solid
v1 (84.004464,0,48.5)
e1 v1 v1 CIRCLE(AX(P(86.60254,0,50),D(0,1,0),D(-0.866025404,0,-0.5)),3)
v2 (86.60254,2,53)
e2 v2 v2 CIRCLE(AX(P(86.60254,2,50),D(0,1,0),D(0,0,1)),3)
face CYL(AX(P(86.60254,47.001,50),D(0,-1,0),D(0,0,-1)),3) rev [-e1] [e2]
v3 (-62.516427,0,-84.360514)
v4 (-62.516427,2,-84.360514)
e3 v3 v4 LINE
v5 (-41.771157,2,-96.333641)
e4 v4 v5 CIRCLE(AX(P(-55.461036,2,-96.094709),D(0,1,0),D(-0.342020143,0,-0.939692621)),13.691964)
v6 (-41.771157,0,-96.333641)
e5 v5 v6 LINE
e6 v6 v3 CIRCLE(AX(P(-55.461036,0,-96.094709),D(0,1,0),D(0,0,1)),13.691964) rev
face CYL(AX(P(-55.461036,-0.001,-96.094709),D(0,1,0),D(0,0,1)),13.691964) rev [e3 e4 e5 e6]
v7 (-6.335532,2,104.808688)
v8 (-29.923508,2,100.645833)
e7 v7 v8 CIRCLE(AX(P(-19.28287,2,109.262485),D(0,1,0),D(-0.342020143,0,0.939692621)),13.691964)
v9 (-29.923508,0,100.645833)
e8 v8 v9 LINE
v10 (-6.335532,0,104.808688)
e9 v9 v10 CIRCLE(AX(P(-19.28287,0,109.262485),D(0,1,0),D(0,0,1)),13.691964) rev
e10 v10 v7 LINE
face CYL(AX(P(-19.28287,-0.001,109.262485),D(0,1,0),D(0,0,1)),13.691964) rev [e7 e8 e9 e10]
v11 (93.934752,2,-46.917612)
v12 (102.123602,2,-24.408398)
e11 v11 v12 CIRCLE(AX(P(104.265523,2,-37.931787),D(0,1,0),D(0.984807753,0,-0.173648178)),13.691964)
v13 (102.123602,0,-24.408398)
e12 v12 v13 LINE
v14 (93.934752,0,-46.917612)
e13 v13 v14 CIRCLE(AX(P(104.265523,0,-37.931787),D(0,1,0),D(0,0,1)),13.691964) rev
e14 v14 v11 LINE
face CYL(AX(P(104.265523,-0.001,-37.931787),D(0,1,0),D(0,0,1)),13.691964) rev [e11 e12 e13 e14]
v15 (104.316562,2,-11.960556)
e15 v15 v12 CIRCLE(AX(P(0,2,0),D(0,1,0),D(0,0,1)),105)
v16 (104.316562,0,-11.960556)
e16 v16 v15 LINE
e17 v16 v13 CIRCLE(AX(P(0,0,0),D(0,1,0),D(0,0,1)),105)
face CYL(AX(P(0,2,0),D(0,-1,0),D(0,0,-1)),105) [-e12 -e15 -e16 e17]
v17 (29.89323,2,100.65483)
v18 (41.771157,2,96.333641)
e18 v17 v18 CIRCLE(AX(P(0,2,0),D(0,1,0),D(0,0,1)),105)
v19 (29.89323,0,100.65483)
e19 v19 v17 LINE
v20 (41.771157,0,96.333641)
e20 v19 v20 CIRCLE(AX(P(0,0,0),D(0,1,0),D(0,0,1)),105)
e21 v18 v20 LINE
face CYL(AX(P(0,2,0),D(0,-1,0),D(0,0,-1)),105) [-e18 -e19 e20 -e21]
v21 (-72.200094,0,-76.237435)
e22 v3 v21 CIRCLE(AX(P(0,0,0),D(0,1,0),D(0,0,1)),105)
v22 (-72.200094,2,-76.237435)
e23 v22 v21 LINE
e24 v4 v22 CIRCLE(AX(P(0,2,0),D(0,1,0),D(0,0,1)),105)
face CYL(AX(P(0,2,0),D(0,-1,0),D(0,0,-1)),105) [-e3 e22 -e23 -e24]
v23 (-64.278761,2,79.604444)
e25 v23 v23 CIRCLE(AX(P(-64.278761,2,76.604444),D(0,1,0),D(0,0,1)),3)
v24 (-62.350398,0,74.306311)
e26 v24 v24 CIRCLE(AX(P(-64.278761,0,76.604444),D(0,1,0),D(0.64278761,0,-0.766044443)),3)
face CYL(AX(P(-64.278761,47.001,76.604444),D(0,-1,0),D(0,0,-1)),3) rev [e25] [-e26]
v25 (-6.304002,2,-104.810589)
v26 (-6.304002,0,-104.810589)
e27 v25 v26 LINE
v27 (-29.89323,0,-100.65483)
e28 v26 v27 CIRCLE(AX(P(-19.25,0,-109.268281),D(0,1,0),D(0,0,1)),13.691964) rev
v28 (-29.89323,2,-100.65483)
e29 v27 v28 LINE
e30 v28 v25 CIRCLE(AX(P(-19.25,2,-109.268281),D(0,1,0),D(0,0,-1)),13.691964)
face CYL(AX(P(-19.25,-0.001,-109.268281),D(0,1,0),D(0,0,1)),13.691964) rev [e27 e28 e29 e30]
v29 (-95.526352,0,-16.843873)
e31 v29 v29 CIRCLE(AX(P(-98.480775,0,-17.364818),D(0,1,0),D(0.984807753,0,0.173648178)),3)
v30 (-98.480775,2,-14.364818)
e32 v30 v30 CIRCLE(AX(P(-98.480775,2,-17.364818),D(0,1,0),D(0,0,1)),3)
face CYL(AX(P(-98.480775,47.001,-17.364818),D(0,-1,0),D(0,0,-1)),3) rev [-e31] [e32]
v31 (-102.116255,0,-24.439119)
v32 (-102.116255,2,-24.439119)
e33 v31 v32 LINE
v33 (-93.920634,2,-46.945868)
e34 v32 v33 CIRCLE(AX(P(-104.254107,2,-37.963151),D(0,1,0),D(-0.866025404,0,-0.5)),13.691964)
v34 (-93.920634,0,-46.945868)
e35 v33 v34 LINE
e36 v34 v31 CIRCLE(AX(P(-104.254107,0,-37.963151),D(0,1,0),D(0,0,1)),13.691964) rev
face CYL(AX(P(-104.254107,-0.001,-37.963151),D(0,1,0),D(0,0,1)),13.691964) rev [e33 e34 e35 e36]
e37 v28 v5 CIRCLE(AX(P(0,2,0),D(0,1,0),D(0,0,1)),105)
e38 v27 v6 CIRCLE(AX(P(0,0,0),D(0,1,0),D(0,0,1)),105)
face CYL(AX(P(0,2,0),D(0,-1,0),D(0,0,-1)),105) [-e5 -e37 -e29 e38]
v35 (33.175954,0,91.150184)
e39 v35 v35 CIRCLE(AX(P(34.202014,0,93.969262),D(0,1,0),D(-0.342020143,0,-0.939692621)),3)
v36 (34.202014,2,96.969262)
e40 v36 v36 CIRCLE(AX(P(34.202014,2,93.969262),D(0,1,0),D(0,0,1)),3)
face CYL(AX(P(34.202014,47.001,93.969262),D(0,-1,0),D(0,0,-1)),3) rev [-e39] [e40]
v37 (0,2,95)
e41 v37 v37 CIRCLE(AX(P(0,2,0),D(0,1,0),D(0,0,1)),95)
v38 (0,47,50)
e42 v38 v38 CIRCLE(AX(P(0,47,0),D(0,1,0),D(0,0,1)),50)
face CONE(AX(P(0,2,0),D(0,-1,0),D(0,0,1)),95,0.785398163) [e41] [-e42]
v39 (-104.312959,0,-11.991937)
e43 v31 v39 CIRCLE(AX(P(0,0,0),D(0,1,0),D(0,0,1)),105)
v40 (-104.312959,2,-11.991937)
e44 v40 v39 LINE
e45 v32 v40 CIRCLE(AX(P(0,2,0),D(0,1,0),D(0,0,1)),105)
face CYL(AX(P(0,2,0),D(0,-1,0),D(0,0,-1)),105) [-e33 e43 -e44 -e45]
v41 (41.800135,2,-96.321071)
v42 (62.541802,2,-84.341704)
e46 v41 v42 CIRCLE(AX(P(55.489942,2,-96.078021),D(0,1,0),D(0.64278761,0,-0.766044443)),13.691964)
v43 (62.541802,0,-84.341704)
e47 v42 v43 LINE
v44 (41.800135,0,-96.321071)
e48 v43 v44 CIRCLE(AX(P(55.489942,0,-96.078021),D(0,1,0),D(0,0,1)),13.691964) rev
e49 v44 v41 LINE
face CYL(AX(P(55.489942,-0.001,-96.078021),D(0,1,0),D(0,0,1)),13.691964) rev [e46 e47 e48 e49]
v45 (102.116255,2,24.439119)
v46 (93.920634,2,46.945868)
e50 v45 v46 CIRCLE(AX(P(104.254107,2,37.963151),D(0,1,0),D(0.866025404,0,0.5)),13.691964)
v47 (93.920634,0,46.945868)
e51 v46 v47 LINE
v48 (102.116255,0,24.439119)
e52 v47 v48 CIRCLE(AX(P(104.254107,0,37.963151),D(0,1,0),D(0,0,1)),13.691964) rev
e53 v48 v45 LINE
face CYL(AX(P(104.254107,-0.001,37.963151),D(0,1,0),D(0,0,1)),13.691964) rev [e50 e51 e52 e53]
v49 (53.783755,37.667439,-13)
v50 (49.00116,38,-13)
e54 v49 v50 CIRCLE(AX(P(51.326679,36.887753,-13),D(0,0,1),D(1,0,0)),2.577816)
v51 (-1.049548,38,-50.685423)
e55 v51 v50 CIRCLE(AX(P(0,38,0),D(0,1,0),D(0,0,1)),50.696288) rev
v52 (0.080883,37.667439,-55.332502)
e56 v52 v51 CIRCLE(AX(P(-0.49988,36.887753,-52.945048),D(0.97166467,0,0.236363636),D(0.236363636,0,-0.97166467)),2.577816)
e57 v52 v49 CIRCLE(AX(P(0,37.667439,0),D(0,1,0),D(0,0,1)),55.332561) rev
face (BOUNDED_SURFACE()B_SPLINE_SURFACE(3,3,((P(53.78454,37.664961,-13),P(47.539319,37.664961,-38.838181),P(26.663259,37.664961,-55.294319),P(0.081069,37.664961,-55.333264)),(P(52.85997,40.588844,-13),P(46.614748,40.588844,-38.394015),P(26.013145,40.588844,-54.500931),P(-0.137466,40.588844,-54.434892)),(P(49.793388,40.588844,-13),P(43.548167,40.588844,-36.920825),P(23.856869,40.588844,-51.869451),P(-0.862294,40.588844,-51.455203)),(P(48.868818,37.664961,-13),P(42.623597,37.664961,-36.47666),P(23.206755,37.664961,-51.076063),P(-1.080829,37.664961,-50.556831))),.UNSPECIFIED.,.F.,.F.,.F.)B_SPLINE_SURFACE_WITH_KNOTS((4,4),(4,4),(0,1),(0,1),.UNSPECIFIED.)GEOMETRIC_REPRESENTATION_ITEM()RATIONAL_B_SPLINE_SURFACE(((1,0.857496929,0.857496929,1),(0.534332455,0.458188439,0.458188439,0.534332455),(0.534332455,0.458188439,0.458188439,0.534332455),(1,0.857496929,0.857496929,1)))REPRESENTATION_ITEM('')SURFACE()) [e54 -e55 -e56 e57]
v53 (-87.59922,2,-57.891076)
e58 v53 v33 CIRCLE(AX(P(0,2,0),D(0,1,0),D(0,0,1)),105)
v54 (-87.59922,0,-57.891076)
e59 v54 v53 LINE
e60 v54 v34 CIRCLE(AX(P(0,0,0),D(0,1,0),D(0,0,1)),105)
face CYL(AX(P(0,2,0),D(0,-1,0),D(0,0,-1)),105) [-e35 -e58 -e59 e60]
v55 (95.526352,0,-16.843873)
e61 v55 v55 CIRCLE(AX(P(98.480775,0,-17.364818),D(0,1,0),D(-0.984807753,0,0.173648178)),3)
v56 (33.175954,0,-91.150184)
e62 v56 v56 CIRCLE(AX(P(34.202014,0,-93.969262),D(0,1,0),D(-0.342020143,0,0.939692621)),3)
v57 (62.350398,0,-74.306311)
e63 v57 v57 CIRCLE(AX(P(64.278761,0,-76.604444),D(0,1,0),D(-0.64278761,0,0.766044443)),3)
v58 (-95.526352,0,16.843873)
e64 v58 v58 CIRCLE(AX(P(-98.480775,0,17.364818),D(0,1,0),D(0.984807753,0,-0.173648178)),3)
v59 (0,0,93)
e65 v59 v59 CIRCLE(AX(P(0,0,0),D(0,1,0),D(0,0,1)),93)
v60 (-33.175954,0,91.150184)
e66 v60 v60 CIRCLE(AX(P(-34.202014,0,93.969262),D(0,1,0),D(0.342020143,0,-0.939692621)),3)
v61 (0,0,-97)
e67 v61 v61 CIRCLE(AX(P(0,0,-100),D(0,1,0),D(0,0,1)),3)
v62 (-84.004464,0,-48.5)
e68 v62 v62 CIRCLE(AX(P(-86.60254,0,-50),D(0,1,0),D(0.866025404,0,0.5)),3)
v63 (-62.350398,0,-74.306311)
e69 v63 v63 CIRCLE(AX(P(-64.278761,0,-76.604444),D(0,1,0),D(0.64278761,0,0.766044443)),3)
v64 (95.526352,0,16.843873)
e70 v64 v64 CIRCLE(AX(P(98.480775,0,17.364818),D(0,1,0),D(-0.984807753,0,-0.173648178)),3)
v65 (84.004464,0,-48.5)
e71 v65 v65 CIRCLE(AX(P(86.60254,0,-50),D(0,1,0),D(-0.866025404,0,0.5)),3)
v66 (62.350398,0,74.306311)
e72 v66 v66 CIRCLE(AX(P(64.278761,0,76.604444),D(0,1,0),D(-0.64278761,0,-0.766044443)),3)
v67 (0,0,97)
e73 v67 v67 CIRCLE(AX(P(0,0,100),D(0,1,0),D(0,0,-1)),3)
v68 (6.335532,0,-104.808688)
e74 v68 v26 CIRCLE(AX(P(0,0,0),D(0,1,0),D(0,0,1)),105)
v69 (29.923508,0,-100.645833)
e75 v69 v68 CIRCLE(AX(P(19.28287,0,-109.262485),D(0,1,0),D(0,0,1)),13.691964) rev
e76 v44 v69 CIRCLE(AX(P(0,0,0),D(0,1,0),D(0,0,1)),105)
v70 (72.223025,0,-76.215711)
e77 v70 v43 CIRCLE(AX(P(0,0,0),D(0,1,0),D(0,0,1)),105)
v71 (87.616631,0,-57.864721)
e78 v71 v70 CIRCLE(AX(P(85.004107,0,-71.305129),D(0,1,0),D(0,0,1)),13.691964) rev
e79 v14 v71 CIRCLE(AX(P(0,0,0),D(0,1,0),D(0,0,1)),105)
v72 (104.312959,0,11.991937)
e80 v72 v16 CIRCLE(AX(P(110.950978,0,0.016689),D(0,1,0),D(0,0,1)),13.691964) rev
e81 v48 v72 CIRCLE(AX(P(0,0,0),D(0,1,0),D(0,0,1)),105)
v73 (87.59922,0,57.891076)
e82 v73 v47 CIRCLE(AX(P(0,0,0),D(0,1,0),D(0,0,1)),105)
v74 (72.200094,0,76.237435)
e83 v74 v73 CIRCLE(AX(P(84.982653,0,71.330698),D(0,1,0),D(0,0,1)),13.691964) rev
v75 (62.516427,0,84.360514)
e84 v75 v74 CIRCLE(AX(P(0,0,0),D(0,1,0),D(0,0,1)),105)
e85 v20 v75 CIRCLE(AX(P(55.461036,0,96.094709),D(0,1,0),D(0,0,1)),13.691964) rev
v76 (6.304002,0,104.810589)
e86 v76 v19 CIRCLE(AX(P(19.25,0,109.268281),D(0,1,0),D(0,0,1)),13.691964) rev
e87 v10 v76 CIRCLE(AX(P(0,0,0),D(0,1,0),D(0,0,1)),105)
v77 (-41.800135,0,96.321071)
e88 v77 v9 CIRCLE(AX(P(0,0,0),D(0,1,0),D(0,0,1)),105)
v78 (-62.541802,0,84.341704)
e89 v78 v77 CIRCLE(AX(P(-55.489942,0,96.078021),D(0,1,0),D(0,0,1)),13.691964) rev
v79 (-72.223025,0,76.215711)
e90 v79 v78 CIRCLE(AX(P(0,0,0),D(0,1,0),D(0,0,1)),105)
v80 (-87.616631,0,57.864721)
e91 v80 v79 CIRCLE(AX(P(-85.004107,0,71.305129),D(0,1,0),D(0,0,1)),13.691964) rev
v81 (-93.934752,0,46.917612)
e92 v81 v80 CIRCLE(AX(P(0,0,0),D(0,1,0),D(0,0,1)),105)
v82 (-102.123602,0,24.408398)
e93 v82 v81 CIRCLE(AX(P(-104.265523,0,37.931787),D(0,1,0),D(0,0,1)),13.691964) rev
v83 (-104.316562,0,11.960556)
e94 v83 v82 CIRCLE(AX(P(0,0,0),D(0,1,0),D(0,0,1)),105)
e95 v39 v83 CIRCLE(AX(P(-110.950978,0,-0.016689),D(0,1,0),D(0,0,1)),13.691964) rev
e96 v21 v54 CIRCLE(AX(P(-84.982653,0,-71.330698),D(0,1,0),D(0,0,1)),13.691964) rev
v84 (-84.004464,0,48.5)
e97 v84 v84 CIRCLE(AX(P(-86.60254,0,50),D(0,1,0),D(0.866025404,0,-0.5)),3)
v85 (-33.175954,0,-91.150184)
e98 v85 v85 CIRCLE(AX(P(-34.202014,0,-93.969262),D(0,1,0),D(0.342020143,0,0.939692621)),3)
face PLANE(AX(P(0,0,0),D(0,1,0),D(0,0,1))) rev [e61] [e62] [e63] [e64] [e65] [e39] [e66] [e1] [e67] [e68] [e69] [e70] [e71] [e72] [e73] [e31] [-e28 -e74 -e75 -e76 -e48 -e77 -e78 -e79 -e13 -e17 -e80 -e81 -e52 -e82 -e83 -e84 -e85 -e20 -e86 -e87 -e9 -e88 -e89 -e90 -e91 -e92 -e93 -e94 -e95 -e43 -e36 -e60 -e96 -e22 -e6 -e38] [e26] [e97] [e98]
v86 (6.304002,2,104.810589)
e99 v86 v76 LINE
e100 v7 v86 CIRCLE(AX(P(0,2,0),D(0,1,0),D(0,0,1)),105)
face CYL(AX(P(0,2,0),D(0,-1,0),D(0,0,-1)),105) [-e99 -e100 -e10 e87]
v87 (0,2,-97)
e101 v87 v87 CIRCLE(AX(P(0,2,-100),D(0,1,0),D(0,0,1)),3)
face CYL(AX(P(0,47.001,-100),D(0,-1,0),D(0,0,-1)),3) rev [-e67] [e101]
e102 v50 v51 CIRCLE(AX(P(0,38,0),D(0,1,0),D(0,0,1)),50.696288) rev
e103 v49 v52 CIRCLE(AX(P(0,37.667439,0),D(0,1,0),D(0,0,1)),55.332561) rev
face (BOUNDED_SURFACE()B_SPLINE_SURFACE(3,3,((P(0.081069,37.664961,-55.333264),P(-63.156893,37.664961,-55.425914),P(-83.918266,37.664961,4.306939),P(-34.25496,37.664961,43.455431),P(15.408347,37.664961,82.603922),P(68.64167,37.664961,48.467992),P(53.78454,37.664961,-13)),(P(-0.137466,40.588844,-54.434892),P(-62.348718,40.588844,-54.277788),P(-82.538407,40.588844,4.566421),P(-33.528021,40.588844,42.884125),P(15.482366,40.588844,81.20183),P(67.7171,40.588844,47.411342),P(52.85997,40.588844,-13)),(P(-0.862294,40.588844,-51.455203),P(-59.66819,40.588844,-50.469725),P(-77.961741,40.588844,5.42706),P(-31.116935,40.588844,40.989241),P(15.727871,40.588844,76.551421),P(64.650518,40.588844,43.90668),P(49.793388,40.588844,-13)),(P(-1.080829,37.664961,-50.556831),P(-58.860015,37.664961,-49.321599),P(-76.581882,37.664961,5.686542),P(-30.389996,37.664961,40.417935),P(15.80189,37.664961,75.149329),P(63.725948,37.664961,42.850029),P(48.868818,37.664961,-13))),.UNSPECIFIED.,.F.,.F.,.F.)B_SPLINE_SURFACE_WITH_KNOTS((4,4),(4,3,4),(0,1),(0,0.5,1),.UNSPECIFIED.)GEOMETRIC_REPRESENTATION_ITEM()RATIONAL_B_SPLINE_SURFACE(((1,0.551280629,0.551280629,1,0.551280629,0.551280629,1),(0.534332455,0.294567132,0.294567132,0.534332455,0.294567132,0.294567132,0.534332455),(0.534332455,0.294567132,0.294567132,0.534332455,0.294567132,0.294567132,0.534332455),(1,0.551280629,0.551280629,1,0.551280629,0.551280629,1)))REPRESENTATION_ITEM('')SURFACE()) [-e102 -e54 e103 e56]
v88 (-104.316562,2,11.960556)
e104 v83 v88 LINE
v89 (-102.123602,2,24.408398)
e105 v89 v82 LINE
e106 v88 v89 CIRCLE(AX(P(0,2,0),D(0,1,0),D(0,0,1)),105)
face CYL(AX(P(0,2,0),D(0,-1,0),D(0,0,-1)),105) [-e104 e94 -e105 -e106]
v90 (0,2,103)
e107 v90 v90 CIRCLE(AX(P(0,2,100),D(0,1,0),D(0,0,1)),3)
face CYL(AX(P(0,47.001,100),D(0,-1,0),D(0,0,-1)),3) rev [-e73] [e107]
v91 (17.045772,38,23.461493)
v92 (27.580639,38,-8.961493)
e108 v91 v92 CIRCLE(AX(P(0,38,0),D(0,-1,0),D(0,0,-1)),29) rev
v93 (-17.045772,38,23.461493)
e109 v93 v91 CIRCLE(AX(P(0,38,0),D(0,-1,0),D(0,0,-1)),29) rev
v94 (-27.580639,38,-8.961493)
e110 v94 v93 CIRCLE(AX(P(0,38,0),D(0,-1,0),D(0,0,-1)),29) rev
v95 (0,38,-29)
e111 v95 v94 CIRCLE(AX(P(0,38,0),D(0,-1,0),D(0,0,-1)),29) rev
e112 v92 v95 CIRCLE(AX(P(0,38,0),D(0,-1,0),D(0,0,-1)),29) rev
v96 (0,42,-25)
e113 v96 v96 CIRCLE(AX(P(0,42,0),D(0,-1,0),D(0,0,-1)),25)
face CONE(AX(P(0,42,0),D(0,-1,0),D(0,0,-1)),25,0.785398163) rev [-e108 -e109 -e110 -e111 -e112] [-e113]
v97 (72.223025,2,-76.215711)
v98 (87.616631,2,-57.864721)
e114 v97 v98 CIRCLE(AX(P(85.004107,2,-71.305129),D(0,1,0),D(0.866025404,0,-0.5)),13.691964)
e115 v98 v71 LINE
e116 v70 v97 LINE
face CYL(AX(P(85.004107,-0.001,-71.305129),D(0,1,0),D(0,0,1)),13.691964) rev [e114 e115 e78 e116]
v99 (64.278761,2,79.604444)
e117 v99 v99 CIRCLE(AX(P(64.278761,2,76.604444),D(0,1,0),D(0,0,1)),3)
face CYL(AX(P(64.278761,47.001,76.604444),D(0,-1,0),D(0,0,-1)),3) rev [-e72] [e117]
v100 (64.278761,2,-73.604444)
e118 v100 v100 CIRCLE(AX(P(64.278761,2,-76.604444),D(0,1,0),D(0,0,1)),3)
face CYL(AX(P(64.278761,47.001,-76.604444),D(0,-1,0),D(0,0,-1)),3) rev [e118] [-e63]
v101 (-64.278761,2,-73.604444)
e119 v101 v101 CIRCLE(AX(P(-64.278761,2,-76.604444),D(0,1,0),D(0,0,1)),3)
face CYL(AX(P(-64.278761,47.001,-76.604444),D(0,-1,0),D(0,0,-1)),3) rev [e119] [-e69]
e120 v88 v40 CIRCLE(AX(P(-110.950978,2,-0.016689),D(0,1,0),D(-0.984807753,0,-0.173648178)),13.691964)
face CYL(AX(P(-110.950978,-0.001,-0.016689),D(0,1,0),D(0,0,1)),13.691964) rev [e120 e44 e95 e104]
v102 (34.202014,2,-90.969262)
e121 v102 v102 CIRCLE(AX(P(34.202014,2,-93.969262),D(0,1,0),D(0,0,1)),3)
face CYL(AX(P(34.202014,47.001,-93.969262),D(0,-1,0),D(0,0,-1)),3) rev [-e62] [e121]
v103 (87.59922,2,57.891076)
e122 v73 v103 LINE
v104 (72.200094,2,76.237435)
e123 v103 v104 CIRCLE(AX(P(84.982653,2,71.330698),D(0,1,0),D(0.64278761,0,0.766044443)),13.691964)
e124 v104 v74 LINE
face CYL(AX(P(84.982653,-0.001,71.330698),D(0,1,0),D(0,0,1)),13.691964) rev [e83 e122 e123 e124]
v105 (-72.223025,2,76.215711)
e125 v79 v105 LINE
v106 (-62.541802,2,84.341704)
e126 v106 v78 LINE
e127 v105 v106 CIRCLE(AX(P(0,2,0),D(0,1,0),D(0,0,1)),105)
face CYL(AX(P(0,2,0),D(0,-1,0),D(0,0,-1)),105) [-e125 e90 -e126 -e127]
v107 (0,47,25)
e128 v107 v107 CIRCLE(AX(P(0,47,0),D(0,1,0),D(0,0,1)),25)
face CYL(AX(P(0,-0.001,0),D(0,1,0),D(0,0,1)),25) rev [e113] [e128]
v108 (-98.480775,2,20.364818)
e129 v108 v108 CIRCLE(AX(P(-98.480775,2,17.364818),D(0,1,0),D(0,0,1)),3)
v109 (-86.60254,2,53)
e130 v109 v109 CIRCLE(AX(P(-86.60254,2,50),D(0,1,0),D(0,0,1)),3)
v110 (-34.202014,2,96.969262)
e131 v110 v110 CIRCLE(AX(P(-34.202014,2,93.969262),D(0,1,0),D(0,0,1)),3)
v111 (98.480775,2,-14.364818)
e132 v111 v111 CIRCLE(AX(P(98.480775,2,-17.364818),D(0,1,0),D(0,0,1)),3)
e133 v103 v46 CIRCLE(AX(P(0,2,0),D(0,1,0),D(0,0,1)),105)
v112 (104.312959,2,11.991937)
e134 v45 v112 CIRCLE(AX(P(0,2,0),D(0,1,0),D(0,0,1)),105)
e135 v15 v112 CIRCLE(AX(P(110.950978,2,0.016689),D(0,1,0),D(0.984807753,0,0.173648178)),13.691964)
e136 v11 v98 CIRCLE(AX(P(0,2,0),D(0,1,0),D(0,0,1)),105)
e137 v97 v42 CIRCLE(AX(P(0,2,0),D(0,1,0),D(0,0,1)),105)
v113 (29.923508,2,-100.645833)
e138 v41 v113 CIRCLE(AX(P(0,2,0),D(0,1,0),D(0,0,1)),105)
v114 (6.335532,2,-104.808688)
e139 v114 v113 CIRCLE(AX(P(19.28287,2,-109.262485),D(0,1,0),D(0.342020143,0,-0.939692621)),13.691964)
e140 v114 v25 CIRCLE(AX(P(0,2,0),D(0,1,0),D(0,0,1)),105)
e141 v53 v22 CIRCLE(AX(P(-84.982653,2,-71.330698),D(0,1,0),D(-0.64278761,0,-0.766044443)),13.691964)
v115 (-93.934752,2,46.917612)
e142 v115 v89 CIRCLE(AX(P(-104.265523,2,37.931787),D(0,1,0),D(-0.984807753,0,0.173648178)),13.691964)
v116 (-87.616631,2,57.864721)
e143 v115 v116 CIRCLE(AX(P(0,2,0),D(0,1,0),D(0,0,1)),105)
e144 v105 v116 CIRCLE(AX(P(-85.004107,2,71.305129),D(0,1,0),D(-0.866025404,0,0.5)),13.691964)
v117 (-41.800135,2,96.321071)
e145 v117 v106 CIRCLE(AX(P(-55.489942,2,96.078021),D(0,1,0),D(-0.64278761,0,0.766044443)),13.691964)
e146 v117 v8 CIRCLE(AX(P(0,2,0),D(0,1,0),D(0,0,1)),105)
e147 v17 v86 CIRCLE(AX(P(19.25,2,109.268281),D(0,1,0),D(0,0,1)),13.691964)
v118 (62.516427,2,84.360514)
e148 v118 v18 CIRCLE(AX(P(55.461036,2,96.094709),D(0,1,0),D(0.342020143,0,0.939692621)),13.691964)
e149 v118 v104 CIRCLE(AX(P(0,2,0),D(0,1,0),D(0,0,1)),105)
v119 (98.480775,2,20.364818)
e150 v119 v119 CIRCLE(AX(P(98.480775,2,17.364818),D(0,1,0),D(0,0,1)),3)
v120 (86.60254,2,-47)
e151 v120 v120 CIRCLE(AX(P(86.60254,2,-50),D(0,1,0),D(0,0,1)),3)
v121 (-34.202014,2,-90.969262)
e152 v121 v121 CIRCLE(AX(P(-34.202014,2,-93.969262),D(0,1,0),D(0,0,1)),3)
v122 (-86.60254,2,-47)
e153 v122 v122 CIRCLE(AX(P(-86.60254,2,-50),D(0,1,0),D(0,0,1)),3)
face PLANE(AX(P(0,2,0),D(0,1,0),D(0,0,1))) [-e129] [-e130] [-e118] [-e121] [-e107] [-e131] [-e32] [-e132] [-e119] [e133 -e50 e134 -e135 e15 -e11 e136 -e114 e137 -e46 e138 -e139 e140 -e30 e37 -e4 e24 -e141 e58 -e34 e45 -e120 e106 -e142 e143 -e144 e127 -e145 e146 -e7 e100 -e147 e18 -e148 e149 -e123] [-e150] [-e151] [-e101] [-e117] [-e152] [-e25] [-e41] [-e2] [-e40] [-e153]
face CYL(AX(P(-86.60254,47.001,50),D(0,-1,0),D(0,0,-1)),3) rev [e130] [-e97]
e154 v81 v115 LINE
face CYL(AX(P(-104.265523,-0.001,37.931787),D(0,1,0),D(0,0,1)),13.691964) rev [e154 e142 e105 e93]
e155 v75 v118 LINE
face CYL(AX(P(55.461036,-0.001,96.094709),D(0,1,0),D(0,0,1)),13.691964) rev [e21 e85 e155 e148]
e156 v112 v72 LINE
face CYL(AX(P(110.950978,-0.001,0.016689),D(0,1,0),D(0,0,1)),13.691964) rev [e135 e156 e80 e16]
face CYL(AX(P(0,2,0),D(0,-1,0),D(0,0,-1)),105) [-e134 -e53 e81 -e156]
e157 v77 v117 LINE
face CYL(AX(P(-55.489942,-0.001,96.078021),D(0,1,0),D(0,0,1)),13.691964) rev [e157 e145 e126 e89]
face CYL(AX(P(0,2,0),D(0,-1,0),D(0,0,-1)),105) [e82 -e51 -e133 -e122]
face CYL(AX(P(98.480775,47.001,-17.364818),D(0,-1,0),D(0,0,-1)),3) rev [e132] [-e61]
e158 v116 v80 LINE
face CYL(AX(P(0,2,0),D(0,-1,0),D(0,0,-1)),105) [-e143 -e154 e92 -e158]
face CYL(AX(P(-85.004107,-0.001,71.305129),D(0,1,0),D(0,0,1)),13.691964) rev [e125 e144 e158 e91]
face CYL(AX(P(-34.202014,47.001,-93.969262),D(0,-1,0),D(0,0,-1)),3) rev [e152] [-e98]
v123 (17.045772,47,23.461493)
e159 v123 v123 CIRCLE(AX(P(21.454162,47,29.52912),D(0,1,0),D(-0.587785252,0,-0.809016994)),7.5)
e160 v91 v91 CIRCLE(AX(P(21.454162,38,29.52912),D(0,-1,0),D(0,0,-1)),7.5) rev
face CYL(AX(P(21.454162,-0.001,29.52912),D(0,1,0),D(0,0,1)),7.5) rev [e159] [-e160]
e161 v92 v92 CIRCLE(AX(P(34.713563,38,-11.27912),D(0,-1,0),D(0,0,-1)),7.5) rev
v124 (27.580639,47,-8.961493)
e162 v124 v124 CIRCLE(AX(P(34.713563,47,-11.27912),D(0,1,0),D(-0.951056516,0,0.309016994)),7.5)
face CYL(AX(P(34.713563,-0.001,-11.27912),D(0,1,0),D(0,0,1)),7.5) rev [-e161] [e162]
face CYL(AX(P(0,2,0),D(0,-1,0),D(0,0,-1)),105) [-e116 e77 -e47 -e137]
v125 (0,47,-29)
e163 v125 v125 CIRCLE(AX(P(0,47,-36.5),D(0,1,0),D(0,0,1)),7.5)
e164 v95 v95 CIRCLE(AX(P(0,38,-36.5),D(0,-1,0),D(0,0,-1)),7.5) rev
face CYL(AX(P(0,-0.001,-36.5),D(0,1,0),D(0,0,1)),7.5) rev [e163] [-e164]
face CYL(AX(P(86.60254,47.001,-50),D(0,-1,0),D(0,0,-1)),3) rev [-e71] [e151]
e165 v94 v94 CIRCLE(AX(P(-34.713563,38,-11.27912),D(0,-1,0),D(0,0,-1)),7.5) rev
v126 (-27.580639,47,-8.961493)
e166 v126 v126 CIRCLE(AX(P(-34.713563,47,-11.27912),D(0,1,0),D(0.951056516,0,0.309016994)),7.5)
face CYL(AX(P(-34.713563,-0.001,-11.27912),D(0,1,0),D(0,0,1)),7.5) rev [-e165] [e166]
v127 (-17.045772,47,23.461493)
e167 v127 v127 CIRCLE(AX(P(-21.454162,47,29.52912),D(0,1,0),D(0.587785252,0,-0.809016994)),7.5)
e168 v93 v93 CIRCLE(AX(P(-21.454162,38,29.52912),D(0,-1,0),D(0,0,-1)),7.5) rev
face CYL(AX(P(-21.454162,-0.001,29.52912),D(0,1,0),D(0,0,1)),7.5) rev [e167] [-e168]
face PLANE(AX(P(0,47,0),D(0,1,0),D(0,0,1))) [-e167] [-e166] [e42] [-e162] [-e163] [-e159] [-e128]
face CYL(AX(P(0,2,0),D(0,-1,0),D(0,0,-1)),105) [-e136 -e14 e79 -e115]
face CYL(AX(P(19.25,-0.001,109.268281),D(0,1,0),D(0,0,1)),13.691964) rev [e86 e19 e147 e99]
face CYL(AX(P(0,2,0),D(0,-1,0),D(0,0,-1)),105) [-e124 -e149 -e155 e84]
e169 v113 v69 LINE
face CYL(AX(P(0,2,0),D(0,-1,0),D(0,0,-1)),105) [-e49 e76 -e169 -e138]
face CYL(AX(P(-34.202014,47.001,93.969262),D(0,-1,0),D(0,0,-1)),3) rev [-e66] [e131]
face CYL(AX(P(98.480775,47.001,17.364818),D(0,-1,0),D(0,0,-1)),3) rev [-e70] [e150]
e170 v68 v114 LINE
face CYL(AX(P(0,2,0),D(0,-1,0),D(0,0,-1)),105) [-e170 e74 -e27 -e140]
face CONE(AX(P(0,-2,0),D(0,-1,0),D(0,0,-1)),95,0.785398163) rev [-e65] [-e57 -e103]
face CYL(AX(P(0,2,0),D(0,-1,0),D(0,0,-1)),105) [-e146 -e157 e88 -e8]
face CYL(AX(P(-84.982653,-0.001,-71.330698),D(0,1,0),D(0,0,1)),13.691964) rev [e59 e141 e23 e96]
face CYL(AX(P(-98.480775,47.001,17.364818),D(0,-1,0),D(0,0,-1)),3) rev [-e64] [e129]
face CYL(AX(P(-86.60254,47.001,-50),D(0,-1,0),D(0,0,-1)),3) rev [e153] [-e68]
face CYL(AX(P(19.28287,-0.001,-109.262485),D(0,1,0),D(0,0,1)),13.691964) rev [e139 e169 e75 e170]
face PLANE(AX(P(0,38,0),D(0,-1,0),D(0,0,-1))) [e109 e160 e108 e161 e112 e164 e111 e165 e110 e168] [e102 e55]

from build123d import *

# Parameters (mm, degrees)
SKETCH1_R           = 105
BOSS_EXTRUDE1_DEPTH = 2
BOSS_EXTRUDE2_START = 2
SKETCH2_R           = 95
BOSS_EXTRUDE2_DEPTH = 45
BOSS_EXTRUDE2_TAPER = 45
CUT_EXTRUDE2_START  = 2
SKETCH3_R           = 95
CUT_EXTRUDE2_DEPTH  = 40
CUT_EXTRUDE2_DRAFT  = -45
CUT_EXTRUDE3_REACH  = 157.753
SKETCH4_R           = 25
CHAMFER7_SIZE       = 4
CUT_EXTRUDE4_REACH  = 157.753
SKETCH7_R           = 7.5
CIRPATTERN1_COUNT   = 5
CUT_EXTRUDE5_REACH  = 157.753
SKETCH10_R          = 3
CIRPATTERN2_COUNT   = 18
CUT_EXTRUDE7_REACH  = 157.161
SKETCH12_R          = 13.691963716
CIRPATTERN4_COUNT   = 18


with BuildPart() as part:
    # Sketch1 → Boss-Extrude1 (new body)
    with BuildSketch(Plane(origin=(0, 0, 0), x_dir=(1, 0, 0), z_dir=(0, 1, 0))):
        Circle(SKETCH1_R)
    extrude(amount=BOSS_EXTRUDE1_DEPTH)

    # Sketch2 → Boss-Extrude2 (add)
    with BuildSketch(Plane(origin=(0, 0, 0), x_dir=(1, 0, 0), z_dir=(0, 1, 0)).offset(BOSS_EXTRUDE2_START)):
        Circle(SKETCH2_R)
    extrude(amount=BOSS_EXTRUDE2_DEPTH, taper=BOSS_EXTRUDE2_TAPER)


with BuildPart() as cut_extrude2_tool:
    # Sketch3 → Cut-Extrude2 (with draft: the straight prism first)
    with BuildSketch(Plane.XZ.offset(CUT_EXTRUDE2_START)):
        Circle(SKETCH3_R)
    extrude(amount=-CUT_EXTRUDE2_DEPTH)
    # Cut-Extrude2: the draft: its side faces are tilted about the plane it starts from
    cut_extrude2_sides = [cut_extrude2_tool.faces().sort_by_distance(p)[0] for p in [
        (-95, 18, 0),
    ]]
    draft(cut_extrude2_sides, Plane.XZ.offset(CUT_EXTRUDE2_START), CUT_EXTRUDE2_DRAFT)


with BuildPart() as part_1:
    add(part.part)

    # Cut-Extrude2: cut by cut_extrude2_tool
    add(cut_extrude2_tool.part, mode=Mode.SUBTRACT)

    # Sketch4 → Cut-Extrude3 (cut, up to next)
    with BuildSketch(Plane(origin=(0, 47, 0), x_dir=(1, 0, 0), z_dir=(0, 1, 0)), mode=Mode.PRIVATE) as cut_extrude3_sk1:
        Circle(SKETCH4_R)
    cut_extrude3_tool1 = extrude(cut_extrude3_sk1.sketch, amount=-CUT_EXTRUDE3_REACH, mode=Mode.PRIVATE) & part_1.part
    add(cut_extrude3_tool1.solids().sort_by_distance((0, 47, 0))[0], mode=Mode.SUBTRACT)

    # Chamfer7
    chamfer7_edges = [part_1.edges().sort_by_distance(p)[0] for p in [
        (-25, 38, 0),
    ]]
    chamfer(chamfer7_edges, length=CHAMFER7_SIZE)

    # Sketch7 → Cut-Extrude4 (cut, up to next)
    with BuildSketch(Plane(origin=(0, 47, 0), x_dir=(1, 0, 0), z_dir=(0, 1, 0)), mode=Mode.PRIVATE) as cut_extrude4_sk1:
        with Locations((0, 36.5)):
            Circle(SKETCH7_R)
    cut_extrude4_tool1 = extrude(cut_extrude4_sk1.sketch, amount=-CUT_EXTRUDE4_REACH, mode=Mode.PRIVATE) & part_1.part
    cut_extrude4 = cut_extrude4_tool1.solids().sort_by_distance((0, 47, -36.5))[0]
    add(cut_extrude4, mode=Mode.SUBTRACT)

    # CirPattern1: Cut-Extrude4 ×5 about axis
    cirpattern1_axis = Axis((0, 47, 0), (0, 1, 0))
    for i in range(1, CIRPATTERN1_COUNT):
        add(cut_extrude4.rotate(cirpattern1_axis, i * 360 / CIRPATTERN1_COUNT), mode=Mode.SUBTRACT)

    # Sketch10 → Cut-Extrude5 (cut, up to next)
    with BuildSketch(Plane(origin=(0, 0, 0), x_dir=(1, 0, 0), z_dir=(0, 1, 0)), mode=Mode.PRIVATE) as cut_extrude5_sk1:
        with Locations((0, 100)):
            Circle(SKETCH10_R)
    cut_extrude5_tool1 = extrude(cut_extrude5_sk1.sketch, amount=CUT_EXTRUDE5_REACH, mode=Mode.PRIVATE) & part_1.part
    cut_extrude5 = cut_extrude5_tool1.solids().sort_by_distance((0, 0, -100))[0]
    add(cut_extrude5, mode=Mode.SUBTRACT)

    # CirPattern2: Cut-Extrude5 ×18 about axis
    cirpattern2_axis = Axis((0, 2, 0), (0, 1, 0))
    for i in range(1, CIRPATTERN2_COUNT):
        add(cut_extrude5.rotate(cirpattern2_axis, i * 360 / CIRPATTERN2_COUNT), mode=Mode.SUBTRACT)

    # Cut-Sweep2: sweep along a curve in space
    with BuildLine() as cut_sweep2_path:
        ThreePointArc((0, 38, -55), (38.890872965, 38, -38.890872965), (55, 38, 0))
        ThreePointArc((55, 38, 0), (38.890872965, 38, 38.890872965), (0, 38, 55))
        ThreePointArc((0, 38, 55), (-38.890872965, 38, 38.890872965), (-55, 38, 0))
        ThreePointArc((-55, 38, 0), (-38.890872965, 38, -38.890872965), (0, 38, -55))
    # Sketch9 → Cut-Sweep2 (sweep, cut)
    with BuildSketch(Plane.XY.offset(-13)):
        with BuildLine():
            Line((48.868817725, 37.664960803), (53.784539882, 37.664960803))
            ThreePointArc((53.784539882, 37.664960803), (51.326678803, 39.465568412), (48.868817725, 37.664960803))
        make_face()
    sweep(path=cut_sweep2_path.line, mode=Mode.SUBTRACT)

    # Sketch12 → Cut-Extrude7 (cut, up to next)
    with BuildSketch(Plane(origin=(0, 2, 0), x_dir=(1, 0, 0), z_dir=(0, 1, 0)), mode=Mode.PRIVATE) as cut_extrude7_sk1:
        with Locations((19.25, -109.268280872)):
            Circle(SKETCH12_R)
    cut_extrude7_tool1 = extrude(cut_extrude7_sk1.sketch, amount=-CUT_EXTRUDE7_REACH, mode=Mode.PRIVATE) & part_1.part
    cut_extrude7 = cut_extrude7_tool1.solids().sort_by_distance((19.25, 2, 109.268281))[0]
    add(cut_extrude7, mode=Mode.SUBTRACT)

    # CirPattern4: Cut-Extrude7 ×18 about axis
    cirpattern4_axis = Axis((0, 2, 0), (0, 1, 0))
    for i in range(1, CIRPATTERN4_COUNT):
        add(cut_extrude7.rotate(cirpattern4_axis, i * 360 / CIRPATTERN4_COUNT), mode=Mode.SUBTRACT)


solid = part_1.part
